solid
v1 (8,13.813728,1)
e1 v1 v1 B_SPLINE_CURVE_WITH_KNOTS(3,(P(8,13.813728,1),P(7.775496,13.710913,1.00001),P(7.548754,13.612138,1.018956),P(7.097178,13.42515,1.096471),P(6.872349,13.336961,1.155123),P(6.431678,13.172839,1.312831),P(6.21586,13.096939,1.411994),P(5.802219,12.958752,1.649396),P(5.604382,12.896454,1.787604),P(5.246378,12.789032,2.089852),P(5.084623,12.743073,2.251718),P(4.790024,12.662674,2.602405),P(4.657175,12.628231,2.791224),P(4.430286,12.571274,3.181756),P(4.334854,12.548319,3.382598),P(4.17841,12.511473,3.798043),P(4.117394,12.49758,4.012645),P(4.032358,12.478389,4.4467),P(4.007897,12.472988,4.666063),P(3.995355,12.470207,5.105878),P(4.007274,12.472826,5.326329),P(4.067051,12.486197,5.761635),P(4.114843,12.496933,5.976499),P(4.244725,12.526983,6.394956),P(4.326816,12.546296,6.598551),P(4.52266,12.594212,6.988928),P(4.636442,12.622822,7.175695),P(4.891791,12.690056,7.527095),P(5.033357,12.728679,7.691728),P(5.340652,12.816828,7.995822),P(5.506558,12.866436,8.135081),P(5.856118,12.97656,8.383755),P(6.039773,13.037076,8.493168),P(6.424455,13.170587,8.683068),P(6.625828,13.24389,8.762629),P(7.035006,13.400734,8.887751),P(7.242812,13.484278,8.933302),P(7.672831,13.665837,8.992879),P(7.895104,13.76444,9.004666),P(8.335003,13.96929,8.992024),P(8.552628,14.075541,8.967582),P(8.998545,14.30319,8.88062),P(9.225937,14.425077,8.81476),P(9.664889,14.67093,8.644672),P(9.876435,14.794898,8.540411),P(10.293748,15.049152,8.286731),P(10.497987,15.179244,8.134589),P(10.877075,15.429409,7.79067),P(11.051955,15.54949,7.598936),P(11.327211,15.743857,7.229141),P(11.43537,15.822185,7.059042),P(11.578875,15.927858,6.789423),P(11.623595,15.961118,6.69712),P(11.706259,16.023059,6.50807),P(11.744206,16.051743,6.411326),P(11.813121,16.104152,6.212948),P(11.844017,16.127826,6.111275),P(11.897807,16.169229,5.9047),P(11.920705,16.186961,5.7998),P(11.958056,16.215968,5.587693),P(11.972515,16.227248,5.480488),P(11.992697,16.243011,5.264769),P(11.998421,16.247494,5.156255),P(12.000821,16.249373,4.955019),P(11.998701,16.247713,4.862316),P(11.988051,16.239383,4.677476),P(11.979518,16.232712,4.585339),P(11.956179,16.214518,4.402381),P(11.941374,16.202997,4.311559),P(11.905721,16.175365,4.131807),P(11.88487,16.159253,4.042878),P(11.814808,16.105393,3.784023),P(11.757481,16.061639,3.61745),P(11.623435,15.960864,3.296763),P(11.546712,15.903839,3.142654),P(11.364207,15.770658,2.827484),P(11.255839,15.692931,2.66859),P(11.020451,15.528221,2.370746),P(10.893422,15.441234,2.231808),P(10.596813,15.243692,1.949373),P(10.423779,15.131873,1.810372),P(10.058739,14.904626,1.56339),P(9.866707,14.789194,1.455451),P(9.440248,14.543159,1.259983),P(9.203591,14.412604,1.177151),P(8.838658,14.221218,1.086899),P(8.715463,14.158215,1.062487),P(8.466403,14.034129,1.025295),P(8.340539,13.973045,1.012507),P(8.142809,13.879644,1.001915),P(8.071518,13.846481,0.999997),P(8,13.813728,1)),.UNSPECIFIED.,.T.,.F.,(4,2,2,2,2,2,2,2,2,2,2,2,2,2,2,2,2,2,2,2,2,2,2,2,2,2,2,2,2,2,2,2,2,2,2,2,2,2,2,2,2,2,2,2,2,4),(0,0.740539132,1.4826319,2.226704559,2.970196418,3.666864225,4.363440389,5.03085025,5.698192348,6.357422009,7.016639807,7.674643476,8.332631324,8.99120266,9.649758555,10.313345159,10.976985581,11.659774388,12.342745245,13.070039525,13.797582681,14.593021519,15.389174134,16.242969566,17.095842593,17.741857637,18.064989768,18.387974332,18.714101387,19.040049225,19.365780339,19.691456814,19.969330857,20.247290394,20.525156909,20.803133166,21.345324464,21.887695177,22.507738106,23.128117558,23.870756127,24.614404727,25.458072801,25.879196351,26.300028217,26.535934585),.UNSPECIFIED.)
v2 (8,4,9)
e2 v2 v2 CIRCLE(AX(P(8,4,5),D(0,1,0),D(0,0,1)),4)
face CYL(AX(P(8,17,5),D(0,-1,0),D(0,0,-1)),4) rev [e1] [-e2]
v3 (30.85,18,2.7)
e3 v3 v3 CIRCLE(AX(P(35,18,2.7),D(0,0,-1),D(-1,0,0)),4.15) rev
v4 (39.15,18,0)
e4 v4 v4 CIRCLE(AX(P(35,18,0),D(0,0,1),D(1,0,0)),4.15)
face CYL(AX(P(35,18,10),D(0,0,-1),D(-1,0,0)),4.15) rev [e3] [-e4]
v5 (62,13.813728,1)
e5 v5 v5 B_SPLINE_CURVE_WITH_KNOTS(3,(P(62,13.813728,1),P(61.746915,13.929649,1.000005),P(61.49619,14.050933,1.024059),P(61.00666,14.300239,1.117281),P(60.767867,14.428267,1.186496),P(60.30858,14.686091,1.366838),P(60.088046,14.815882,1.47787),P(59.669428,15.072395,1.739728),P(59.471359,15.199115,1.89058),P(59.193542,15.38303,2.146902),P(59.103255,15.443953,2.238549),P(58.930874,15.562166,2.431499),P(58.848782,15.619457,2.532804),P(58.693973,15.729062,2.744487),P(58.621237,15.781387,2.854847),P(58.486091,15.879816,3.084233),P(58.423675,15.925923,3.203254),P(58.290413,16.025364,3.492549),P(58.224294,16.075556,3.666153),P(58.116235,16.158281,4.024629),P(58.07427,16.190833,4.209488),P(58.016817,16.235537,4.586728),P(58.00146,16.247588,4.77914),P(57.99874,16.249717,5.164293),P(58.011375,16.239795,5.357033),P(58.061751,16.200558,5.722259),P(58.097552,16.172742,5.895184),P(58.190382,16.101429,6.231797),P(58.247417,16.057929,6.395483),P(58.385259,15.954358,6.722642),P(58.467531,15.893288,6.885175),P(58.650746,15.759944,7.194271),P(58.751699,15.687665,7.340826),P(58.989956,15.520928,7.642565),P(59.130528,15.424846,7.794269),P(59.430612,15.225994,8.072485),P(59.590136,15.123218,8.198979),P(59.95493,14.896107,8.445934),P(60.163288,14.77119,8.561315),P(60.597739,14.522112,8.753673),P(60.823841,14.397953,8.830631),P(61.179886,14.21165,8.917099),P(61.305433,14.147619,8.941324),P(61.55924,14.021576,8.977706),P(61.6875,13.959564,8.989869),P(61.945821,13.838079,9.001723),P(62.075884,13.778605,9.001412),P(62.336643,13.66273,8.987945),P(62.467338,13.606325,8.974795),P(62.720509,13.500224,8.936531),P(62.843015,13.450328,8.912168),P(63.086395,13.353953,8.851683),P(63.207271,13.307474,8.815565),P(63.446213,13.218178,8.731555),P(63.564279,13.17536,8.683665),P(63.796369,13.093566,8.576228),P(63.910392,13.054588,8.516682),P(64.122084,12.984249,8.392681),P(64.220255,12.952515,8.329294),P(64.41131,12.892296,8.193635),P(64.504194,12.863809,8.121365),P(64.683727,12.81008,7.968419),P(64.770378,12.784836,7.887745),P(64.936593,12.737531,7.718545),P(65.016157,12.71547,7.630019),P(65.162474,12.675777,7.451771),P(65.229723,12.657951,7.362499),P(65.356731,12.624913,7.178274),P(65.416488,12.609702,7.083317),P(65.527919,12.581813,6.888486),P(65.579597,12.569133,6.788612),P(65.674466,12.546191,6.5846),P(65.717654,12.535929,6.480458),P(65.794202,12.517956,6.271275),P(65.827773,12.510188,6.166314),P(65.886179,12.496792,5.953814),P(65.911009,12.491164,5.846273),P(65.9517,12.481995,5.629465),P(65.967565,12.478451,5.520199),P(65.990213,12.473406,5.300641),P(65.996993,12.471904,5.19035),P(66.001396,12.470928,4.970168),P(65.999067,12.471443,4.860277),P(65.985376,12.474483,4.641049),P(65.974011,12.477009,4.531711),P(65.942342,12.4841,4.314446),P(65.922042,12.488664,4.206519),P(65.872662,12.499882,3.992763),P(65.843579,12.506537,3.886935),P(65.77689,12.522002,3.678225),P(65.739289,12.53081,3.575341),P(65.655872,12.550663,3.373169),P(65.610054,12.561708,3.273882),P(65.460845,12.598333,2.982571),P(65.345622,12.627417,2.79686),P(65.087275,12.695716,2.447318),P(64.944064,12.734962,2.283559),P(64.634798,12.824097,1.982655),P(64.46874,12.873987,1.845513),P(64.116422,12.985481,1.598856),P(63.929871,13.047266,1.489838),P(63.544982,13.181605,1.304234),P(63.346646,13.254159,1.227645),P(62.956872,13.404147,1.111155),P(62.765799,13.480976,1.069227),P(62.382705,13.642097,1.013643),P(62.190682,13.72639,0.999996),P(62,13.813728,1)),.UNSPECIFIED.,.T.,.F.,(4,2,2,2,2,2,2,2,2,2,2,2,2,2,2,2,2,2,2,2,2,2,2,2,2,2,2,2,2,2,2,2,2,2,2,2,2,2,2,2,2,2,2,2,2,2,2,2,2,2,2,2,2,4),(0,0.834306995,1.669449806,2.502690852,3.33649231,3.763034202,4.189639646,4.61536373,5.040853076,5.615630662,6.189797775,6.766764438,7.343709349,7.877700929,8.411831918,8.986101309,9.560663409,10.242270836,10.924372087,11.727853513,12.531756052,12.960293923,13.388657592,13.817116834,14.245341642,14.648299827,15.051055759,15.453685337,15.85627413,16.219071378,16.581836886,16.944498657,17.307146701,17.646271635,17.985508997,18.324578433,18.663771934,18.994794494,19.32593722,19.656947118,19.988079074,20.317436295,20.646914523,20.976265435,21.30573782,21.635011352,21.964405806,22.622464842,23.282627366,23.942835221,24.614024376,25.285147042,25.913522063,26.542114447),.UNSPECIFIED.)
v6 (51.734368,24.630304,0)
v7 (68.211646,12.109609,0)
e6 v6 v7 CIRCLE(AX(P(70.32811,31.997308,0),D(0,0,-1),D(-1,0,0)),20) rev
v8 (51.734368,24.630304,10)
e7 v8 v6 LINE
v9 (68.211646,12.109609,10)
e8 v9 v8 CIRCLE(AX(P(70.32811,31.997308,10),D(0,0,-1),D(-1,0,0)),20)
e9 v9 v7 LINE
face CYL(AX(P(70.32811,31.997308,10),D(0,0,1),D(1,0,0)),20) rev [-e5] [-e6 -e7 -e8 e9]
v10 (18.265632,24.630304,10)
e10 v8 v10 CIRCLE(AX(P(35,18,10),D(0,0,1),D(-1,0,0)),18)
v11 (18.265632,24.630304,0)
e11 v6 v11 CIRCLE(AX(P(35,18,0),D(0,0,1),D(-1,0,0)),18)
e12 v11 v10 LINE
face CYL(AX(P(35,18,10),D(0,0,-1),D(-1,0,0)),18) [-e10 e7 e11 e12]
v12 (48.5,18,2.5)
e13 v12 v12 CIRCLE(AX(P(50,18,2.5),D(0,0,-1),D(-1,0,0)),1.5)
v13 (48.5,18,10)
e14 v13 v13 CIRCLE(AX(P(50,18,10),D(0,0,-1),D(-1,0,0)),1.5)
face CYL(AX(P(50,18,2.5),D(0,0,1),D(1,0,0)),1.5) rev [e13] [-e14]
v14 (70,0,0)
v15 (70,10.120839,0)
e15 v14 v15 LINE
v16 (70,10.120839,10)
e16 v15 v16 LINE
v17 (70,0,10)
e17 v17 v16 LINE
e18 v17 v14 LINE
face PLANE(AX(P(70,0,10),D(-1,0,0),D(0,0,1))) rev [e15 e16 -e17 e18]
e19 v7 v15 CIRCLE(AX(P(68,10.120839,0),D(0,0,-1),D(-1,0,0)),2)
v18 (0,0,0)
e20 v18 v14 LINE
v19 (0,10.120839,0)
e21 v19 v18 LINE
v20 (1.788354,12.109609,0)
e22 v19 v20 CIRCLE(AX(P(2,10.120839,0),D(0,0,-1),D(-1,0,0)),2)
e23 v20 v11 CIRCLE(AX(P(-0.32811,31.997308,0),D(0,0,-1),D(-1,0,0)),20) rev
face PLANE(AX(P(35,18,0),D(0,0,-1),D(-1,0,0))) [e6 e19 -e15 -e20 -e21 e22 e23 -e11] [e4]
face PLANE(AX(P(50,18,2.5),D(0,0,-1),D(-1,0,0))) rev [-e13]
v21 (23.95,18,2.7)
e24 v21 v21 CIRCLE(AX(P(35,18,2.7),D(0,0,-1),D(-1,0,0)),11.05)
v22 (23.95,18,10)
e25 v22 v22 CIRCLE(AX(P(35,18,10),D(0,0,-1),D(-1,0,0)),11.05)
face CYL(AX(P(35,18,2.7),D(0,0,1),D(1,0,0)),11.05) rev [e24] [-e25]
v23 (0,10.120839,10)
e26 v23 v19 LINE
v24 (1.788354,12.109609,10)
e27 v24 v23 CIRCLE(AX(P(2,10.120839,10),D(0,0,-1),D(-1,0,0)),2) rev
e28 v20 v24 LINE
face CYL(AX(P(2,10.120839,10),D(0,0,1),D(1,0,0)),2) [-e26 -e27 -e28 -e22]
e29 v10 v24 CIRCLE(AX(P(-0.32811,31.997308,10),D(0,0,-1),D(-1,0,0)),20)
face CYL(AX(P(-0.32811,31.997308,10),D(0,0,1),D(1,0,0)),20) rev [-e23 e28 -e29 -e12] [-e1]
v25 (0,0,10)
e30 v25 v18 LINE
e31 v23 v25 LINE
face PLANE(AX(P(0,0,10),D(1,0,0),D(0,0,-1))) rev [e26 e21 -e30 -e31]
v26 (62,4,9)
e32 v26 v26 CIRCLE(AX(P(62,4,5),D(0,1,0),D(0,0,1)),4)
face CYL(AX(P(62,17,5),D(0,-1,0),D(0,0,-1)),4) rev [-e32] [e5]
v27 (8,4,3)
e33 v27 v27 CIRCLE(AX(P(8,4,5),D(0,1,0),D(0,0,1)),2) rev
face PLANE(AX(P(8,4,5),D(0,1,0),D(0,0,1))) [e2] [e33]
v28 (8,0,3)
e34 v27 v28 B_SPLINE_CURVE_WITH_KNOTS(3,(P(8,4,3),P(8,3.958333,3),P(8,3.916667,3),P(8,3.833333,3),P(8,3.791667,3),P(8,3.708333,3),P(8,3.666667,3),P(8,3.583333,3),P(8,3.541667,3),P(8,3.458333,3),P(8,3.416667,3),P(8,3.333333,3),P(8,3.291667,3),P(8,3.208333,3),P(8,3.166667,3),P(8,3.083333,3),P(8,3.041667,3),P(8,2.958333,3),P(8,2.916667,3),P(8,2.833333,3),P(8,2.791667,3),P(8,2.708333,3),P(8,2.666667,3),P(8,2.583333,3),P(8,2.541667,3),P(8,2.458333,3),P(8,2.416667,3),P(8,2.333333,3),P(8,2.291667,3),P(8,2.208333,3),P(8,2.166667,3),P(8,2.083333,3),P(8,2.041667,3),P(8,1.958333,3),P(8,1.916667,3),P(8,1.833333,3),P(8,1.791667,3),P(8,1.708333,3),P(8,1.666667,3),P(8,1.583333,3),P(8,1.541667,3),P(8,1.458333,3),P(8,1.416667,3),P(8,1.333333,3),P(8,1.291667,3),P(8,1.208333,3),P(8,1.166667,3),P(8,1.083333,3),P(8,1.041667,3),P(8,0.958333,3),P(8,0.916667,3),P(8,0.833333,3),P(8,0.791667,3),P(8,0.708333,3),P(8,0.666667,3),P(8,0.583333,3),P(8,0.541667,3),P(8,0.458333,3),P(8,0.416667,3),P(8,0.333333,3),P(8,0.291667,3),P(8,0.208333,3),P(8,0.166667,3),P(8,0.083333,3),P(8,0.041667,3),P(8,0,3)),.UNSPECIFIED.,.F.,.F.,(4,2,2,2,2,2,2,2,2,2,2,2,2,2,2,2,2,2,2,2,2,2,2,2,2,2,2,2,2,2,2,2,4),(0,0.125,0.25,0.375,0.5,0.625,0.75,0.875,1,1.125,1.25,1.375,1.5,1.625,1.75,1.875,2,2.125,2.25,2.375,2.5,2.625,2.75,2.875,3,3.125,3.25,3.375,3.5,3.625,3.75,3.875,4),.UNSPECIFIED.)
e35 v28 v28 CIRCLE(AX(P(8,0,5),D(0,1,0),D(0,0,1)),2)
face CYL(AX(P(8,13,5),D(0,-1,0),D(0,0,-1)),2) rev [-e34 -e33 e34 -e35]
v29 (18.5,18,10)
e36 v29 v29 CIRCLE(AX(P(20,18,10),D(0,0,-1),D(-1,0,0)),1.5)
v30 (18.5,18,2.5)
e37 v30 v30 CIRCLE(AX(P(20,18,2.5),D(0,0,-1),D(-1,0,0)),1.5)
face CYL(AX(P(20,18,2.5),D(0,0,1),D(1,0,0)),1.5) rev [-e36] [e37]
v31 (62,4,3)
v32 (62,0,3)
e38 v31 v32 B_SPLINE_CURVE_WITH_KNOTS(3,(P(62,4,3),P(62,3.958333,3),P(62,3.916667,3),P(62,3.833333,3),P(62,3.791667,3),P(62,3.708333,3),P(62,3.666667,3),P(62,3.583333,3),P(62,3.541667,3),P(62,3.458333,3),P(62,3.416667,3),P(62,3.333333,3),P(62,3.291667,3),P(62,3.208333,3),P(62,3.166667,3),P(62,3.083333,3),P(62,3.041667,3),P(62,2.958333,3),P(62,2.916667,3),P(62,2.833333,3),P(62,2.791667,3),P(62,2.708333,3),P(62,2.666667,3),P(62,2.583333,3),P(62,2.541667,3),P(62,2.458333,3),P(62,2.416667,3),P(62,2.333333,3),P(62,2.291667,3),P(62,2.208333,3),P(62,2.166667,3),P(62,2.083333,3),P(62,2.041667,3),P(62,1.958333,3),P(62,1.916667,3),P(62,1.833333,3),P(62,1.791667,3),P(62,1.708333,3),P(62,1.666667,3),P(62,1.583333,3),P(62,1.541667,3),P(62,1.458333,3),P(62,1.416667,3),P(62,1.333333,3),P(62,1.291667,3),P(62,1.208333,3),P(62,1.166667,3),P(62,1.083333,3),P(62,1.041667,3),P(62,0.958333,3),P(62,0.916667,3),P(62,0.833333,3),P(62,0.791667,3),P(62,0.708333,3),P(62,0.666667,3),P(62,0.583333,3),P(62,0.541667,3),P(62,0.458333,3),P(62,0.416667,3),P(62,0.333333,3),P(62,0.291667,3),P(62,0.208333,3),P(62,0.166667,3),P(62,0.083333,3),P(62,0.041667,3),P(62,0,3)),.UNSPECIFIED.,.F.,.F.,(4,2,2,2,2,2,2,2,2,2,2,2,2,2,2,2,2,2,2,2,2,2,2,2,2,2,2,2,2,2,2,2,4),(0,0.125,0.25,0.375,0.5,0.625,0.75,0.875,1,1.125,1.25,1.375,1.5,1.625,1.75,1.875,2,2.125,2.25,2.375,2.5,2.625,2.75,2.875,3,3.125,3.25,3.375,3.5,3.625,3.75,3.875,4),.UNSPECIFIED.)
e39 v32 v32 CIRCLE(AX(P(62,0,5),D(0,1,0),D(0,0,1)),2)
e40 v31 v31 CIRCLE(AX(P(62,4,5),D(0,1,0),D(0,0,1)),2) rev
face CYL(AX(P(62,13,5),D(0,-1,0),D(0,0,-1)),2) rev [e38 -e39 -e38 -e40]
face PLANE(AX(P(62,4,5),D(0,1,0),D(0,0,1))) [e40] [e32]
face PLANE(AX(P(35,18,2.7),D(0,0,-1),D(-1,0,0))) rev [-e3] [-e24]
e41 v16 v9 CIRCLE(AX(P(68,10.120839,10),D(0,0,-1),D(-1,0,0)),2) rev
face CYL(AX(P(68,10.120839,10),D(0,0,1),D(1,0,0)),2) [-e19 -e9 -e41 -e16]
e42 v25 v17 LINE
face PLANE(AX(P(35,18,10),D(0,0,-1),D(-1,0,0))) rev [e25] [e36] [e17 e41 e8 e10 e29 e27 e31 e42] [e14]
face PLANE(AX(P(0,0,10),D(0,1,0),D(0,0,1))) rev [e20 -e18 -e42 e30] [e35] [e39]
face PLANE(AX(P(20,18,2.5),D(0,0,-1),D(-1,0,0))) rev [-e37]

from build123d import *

# Parameters (mm, degrees)
BOSS_EXTRUDE1_DEPTH = 10
FILLET1_R           = 20
CUT_EXTRUDE1_START  = 10
SKETCH2_R           = 11.05
CUT_EXTRUDE1_DEPTH  = 7.3
SKETCH5_R           = 4.15
CUT_EXTRUDE2_DEPTH  = 10
FILLET2_R           = 2
CUT_EXTRUDE3_START  = 4
SKETCH6_R           = 4
CUT_EXTRUDE3_DEPTH  = 13
SKETCH7_R           = 2
CUT_EXTRUDE4_DEPTH  = 13
CUT_EXTRUDE5_START  = 10
SKETCH9_R           = 1.5
CUT_EXTRUDE5_DEPTH  = 7.5


with BuildPart() as part:
    # Sketch1 → Boss-Extrude1 (new body)
    with BuildSketch(Plane.XY):
        with BuildLine():
            Line((0, 12), (18.029437252, 12))
            ThreePointArc((18.029437252, 12), (35, 36), (51.970562748, 12))
            Line((51.970562748, 12), (70, 12))
            Line((70, 12), (70, 0))
            Line((70, 0), (0, 0))
            Line((0, 0), (0, 12))
        make_face()
    extrude(amount=BOSS_EXTRUDE1_DEPTH)

    # Fillet1
    # the kernel refuses this fillet: 20 mm, written as the material it adds along each edge
    with BuildSketch(Plane(origin=(18.029437252, 12, 0), x_dir=(-1, 0, 0), z_dir=(0, 0, 1))) as fillet1_piece_1:
        with BuildLine():
            CenterArc((18.357547265, -19.997308414), FILLET1_R, 90.94000812, 67.446084787)
            Line((-0.236194847, -12.630303986), (-0.608069689, -12.482963897))
            ThreePointArc((-0.608069689, -12.482963897), (0.626360574, -6.329073839), (-0.377123617, -0.133333333))
            Line((-0.377123617, -0.133333333), (0, 0.4))
            ThreePointArc((0, 0.4), (9.014718626, 0.4), (18.022875051, 0.399946168))
            Line((18.022875051, 0.399946168), (18.029437252, 0))
        make_face()
    extrude(amount=10)
    with BuildSketch(Plane(origin=(51.970562748, 12, 0), x_dir=(-0.018697377190164018, 0.9998251887636201, 0), z_dir=(0, 0, 1))) as fillet1_piece_2:
        with BuildLine():
            CenterArc((19.650574675, -18.728235378), FILLET1_R, 110.542563864, 67.446084787)
            Line((-0.337103189, -18.026285503), (-0.736856746, -18.012246506))
            ThreePointArc((-0.736856746, -18.012246506), (-0.56848167, -9.005663801), (-0.399930076, 0.007478951))
            Line((-0.399930076, 0.007478951), (0.140361248, 0.374564708))
            ThreePointArc((0.140361248, 0.374564708), (6.316256145, -0.74458816), (12.492151043, 0.374564708))
            Line((12.492151043, 0.374564708), (12.632512291, 0))
        make_face()
    extrude(amount=10)

    # Sketch2 → Cut-Extrude1 (cut)
    with BuildSketch(Plane.XY.offset(CUT_EXTRUDE1_START)):
        with Locations(Location((35, 18, 0), (0, 0, 180))):
            Circle(SKETCH2_R)
    extrude(amount=-CUT_EXTRUDE1_DEPTH, mode=Mode.SUBTRACT)

    # Sketch5 → Cut-Extrude2 (cut)
    with BuildSketch(Plane.XY):
        with Locations(Location((35, 18, 0), (0, 0, 180))):
            Circle(SKETCH5_R)
    extrude(amount=CUT_EXTRUDE2_DEPTH, mode=Mode.SUBTRACT)

    # Fillet2
    fillet2_edges = [part.edges().sort_by_distance(p)[0] for p in [
        (0, 12, 5),
        (70, 12, 5),
    ]]
    fillet(fillet2_edges, radius=FILLET2_R)

    # Sketch6 → Cut-Extrude3 (cut)
    with BuildSketch(Plane(origin=(0, 0, 0), x_dir=(1, 0, 0), z_dir=(0, 1, 0)).offset(CUT_EXTRUDE3_START)):
        with Locations(Location((8, -5, 0), (0, 0, 90))):
            Circle(SKETCH6_R)
        with Locations(Location((62, -5, 0), (0, 0, 90))):
            Circle(SKETCH6_R)
    extrude(amount=CUT_EXTRUDE3_DEPTH, mode=Mode.SUBTRACT)

    # Sketch7 → Cut-Extrude4 (cut)
    with BuildSketch(Plane(origin=(0, 0, 0), x_dir=(1, 0, 0), z_dir=(0, 1, 0))):
        with Locations(Location((8, -5, 0), (0, 0, 90))):
            Circle(SKETCH7_R)
        with Locations(Location((62, -5, 0), (0, 0, 90))):
            Circle(SKETCH7_R)
    extrude(amount=CUT_EXTRUDE4_DEPTH, mode=Mode.SUBTRACT)

    # Sketch9 → Cut-Extrude5 (cut)
    with BuildSketch(Plane.XY.offset(CUT_EXTRUDE5_START)):
        with Locations(Location((20, 18, 0), (0, 0, 180))):
            Circle(SKETCH9_R)
        with Locations(Location((50, 18, 0), (0, 0, 180))):
            Circle(SKETCH9_R)
    extrude(amount=-CUT_EXTRUDE5_DEPTH, mode=Mode.SUBTRACT)


solid = part.part
